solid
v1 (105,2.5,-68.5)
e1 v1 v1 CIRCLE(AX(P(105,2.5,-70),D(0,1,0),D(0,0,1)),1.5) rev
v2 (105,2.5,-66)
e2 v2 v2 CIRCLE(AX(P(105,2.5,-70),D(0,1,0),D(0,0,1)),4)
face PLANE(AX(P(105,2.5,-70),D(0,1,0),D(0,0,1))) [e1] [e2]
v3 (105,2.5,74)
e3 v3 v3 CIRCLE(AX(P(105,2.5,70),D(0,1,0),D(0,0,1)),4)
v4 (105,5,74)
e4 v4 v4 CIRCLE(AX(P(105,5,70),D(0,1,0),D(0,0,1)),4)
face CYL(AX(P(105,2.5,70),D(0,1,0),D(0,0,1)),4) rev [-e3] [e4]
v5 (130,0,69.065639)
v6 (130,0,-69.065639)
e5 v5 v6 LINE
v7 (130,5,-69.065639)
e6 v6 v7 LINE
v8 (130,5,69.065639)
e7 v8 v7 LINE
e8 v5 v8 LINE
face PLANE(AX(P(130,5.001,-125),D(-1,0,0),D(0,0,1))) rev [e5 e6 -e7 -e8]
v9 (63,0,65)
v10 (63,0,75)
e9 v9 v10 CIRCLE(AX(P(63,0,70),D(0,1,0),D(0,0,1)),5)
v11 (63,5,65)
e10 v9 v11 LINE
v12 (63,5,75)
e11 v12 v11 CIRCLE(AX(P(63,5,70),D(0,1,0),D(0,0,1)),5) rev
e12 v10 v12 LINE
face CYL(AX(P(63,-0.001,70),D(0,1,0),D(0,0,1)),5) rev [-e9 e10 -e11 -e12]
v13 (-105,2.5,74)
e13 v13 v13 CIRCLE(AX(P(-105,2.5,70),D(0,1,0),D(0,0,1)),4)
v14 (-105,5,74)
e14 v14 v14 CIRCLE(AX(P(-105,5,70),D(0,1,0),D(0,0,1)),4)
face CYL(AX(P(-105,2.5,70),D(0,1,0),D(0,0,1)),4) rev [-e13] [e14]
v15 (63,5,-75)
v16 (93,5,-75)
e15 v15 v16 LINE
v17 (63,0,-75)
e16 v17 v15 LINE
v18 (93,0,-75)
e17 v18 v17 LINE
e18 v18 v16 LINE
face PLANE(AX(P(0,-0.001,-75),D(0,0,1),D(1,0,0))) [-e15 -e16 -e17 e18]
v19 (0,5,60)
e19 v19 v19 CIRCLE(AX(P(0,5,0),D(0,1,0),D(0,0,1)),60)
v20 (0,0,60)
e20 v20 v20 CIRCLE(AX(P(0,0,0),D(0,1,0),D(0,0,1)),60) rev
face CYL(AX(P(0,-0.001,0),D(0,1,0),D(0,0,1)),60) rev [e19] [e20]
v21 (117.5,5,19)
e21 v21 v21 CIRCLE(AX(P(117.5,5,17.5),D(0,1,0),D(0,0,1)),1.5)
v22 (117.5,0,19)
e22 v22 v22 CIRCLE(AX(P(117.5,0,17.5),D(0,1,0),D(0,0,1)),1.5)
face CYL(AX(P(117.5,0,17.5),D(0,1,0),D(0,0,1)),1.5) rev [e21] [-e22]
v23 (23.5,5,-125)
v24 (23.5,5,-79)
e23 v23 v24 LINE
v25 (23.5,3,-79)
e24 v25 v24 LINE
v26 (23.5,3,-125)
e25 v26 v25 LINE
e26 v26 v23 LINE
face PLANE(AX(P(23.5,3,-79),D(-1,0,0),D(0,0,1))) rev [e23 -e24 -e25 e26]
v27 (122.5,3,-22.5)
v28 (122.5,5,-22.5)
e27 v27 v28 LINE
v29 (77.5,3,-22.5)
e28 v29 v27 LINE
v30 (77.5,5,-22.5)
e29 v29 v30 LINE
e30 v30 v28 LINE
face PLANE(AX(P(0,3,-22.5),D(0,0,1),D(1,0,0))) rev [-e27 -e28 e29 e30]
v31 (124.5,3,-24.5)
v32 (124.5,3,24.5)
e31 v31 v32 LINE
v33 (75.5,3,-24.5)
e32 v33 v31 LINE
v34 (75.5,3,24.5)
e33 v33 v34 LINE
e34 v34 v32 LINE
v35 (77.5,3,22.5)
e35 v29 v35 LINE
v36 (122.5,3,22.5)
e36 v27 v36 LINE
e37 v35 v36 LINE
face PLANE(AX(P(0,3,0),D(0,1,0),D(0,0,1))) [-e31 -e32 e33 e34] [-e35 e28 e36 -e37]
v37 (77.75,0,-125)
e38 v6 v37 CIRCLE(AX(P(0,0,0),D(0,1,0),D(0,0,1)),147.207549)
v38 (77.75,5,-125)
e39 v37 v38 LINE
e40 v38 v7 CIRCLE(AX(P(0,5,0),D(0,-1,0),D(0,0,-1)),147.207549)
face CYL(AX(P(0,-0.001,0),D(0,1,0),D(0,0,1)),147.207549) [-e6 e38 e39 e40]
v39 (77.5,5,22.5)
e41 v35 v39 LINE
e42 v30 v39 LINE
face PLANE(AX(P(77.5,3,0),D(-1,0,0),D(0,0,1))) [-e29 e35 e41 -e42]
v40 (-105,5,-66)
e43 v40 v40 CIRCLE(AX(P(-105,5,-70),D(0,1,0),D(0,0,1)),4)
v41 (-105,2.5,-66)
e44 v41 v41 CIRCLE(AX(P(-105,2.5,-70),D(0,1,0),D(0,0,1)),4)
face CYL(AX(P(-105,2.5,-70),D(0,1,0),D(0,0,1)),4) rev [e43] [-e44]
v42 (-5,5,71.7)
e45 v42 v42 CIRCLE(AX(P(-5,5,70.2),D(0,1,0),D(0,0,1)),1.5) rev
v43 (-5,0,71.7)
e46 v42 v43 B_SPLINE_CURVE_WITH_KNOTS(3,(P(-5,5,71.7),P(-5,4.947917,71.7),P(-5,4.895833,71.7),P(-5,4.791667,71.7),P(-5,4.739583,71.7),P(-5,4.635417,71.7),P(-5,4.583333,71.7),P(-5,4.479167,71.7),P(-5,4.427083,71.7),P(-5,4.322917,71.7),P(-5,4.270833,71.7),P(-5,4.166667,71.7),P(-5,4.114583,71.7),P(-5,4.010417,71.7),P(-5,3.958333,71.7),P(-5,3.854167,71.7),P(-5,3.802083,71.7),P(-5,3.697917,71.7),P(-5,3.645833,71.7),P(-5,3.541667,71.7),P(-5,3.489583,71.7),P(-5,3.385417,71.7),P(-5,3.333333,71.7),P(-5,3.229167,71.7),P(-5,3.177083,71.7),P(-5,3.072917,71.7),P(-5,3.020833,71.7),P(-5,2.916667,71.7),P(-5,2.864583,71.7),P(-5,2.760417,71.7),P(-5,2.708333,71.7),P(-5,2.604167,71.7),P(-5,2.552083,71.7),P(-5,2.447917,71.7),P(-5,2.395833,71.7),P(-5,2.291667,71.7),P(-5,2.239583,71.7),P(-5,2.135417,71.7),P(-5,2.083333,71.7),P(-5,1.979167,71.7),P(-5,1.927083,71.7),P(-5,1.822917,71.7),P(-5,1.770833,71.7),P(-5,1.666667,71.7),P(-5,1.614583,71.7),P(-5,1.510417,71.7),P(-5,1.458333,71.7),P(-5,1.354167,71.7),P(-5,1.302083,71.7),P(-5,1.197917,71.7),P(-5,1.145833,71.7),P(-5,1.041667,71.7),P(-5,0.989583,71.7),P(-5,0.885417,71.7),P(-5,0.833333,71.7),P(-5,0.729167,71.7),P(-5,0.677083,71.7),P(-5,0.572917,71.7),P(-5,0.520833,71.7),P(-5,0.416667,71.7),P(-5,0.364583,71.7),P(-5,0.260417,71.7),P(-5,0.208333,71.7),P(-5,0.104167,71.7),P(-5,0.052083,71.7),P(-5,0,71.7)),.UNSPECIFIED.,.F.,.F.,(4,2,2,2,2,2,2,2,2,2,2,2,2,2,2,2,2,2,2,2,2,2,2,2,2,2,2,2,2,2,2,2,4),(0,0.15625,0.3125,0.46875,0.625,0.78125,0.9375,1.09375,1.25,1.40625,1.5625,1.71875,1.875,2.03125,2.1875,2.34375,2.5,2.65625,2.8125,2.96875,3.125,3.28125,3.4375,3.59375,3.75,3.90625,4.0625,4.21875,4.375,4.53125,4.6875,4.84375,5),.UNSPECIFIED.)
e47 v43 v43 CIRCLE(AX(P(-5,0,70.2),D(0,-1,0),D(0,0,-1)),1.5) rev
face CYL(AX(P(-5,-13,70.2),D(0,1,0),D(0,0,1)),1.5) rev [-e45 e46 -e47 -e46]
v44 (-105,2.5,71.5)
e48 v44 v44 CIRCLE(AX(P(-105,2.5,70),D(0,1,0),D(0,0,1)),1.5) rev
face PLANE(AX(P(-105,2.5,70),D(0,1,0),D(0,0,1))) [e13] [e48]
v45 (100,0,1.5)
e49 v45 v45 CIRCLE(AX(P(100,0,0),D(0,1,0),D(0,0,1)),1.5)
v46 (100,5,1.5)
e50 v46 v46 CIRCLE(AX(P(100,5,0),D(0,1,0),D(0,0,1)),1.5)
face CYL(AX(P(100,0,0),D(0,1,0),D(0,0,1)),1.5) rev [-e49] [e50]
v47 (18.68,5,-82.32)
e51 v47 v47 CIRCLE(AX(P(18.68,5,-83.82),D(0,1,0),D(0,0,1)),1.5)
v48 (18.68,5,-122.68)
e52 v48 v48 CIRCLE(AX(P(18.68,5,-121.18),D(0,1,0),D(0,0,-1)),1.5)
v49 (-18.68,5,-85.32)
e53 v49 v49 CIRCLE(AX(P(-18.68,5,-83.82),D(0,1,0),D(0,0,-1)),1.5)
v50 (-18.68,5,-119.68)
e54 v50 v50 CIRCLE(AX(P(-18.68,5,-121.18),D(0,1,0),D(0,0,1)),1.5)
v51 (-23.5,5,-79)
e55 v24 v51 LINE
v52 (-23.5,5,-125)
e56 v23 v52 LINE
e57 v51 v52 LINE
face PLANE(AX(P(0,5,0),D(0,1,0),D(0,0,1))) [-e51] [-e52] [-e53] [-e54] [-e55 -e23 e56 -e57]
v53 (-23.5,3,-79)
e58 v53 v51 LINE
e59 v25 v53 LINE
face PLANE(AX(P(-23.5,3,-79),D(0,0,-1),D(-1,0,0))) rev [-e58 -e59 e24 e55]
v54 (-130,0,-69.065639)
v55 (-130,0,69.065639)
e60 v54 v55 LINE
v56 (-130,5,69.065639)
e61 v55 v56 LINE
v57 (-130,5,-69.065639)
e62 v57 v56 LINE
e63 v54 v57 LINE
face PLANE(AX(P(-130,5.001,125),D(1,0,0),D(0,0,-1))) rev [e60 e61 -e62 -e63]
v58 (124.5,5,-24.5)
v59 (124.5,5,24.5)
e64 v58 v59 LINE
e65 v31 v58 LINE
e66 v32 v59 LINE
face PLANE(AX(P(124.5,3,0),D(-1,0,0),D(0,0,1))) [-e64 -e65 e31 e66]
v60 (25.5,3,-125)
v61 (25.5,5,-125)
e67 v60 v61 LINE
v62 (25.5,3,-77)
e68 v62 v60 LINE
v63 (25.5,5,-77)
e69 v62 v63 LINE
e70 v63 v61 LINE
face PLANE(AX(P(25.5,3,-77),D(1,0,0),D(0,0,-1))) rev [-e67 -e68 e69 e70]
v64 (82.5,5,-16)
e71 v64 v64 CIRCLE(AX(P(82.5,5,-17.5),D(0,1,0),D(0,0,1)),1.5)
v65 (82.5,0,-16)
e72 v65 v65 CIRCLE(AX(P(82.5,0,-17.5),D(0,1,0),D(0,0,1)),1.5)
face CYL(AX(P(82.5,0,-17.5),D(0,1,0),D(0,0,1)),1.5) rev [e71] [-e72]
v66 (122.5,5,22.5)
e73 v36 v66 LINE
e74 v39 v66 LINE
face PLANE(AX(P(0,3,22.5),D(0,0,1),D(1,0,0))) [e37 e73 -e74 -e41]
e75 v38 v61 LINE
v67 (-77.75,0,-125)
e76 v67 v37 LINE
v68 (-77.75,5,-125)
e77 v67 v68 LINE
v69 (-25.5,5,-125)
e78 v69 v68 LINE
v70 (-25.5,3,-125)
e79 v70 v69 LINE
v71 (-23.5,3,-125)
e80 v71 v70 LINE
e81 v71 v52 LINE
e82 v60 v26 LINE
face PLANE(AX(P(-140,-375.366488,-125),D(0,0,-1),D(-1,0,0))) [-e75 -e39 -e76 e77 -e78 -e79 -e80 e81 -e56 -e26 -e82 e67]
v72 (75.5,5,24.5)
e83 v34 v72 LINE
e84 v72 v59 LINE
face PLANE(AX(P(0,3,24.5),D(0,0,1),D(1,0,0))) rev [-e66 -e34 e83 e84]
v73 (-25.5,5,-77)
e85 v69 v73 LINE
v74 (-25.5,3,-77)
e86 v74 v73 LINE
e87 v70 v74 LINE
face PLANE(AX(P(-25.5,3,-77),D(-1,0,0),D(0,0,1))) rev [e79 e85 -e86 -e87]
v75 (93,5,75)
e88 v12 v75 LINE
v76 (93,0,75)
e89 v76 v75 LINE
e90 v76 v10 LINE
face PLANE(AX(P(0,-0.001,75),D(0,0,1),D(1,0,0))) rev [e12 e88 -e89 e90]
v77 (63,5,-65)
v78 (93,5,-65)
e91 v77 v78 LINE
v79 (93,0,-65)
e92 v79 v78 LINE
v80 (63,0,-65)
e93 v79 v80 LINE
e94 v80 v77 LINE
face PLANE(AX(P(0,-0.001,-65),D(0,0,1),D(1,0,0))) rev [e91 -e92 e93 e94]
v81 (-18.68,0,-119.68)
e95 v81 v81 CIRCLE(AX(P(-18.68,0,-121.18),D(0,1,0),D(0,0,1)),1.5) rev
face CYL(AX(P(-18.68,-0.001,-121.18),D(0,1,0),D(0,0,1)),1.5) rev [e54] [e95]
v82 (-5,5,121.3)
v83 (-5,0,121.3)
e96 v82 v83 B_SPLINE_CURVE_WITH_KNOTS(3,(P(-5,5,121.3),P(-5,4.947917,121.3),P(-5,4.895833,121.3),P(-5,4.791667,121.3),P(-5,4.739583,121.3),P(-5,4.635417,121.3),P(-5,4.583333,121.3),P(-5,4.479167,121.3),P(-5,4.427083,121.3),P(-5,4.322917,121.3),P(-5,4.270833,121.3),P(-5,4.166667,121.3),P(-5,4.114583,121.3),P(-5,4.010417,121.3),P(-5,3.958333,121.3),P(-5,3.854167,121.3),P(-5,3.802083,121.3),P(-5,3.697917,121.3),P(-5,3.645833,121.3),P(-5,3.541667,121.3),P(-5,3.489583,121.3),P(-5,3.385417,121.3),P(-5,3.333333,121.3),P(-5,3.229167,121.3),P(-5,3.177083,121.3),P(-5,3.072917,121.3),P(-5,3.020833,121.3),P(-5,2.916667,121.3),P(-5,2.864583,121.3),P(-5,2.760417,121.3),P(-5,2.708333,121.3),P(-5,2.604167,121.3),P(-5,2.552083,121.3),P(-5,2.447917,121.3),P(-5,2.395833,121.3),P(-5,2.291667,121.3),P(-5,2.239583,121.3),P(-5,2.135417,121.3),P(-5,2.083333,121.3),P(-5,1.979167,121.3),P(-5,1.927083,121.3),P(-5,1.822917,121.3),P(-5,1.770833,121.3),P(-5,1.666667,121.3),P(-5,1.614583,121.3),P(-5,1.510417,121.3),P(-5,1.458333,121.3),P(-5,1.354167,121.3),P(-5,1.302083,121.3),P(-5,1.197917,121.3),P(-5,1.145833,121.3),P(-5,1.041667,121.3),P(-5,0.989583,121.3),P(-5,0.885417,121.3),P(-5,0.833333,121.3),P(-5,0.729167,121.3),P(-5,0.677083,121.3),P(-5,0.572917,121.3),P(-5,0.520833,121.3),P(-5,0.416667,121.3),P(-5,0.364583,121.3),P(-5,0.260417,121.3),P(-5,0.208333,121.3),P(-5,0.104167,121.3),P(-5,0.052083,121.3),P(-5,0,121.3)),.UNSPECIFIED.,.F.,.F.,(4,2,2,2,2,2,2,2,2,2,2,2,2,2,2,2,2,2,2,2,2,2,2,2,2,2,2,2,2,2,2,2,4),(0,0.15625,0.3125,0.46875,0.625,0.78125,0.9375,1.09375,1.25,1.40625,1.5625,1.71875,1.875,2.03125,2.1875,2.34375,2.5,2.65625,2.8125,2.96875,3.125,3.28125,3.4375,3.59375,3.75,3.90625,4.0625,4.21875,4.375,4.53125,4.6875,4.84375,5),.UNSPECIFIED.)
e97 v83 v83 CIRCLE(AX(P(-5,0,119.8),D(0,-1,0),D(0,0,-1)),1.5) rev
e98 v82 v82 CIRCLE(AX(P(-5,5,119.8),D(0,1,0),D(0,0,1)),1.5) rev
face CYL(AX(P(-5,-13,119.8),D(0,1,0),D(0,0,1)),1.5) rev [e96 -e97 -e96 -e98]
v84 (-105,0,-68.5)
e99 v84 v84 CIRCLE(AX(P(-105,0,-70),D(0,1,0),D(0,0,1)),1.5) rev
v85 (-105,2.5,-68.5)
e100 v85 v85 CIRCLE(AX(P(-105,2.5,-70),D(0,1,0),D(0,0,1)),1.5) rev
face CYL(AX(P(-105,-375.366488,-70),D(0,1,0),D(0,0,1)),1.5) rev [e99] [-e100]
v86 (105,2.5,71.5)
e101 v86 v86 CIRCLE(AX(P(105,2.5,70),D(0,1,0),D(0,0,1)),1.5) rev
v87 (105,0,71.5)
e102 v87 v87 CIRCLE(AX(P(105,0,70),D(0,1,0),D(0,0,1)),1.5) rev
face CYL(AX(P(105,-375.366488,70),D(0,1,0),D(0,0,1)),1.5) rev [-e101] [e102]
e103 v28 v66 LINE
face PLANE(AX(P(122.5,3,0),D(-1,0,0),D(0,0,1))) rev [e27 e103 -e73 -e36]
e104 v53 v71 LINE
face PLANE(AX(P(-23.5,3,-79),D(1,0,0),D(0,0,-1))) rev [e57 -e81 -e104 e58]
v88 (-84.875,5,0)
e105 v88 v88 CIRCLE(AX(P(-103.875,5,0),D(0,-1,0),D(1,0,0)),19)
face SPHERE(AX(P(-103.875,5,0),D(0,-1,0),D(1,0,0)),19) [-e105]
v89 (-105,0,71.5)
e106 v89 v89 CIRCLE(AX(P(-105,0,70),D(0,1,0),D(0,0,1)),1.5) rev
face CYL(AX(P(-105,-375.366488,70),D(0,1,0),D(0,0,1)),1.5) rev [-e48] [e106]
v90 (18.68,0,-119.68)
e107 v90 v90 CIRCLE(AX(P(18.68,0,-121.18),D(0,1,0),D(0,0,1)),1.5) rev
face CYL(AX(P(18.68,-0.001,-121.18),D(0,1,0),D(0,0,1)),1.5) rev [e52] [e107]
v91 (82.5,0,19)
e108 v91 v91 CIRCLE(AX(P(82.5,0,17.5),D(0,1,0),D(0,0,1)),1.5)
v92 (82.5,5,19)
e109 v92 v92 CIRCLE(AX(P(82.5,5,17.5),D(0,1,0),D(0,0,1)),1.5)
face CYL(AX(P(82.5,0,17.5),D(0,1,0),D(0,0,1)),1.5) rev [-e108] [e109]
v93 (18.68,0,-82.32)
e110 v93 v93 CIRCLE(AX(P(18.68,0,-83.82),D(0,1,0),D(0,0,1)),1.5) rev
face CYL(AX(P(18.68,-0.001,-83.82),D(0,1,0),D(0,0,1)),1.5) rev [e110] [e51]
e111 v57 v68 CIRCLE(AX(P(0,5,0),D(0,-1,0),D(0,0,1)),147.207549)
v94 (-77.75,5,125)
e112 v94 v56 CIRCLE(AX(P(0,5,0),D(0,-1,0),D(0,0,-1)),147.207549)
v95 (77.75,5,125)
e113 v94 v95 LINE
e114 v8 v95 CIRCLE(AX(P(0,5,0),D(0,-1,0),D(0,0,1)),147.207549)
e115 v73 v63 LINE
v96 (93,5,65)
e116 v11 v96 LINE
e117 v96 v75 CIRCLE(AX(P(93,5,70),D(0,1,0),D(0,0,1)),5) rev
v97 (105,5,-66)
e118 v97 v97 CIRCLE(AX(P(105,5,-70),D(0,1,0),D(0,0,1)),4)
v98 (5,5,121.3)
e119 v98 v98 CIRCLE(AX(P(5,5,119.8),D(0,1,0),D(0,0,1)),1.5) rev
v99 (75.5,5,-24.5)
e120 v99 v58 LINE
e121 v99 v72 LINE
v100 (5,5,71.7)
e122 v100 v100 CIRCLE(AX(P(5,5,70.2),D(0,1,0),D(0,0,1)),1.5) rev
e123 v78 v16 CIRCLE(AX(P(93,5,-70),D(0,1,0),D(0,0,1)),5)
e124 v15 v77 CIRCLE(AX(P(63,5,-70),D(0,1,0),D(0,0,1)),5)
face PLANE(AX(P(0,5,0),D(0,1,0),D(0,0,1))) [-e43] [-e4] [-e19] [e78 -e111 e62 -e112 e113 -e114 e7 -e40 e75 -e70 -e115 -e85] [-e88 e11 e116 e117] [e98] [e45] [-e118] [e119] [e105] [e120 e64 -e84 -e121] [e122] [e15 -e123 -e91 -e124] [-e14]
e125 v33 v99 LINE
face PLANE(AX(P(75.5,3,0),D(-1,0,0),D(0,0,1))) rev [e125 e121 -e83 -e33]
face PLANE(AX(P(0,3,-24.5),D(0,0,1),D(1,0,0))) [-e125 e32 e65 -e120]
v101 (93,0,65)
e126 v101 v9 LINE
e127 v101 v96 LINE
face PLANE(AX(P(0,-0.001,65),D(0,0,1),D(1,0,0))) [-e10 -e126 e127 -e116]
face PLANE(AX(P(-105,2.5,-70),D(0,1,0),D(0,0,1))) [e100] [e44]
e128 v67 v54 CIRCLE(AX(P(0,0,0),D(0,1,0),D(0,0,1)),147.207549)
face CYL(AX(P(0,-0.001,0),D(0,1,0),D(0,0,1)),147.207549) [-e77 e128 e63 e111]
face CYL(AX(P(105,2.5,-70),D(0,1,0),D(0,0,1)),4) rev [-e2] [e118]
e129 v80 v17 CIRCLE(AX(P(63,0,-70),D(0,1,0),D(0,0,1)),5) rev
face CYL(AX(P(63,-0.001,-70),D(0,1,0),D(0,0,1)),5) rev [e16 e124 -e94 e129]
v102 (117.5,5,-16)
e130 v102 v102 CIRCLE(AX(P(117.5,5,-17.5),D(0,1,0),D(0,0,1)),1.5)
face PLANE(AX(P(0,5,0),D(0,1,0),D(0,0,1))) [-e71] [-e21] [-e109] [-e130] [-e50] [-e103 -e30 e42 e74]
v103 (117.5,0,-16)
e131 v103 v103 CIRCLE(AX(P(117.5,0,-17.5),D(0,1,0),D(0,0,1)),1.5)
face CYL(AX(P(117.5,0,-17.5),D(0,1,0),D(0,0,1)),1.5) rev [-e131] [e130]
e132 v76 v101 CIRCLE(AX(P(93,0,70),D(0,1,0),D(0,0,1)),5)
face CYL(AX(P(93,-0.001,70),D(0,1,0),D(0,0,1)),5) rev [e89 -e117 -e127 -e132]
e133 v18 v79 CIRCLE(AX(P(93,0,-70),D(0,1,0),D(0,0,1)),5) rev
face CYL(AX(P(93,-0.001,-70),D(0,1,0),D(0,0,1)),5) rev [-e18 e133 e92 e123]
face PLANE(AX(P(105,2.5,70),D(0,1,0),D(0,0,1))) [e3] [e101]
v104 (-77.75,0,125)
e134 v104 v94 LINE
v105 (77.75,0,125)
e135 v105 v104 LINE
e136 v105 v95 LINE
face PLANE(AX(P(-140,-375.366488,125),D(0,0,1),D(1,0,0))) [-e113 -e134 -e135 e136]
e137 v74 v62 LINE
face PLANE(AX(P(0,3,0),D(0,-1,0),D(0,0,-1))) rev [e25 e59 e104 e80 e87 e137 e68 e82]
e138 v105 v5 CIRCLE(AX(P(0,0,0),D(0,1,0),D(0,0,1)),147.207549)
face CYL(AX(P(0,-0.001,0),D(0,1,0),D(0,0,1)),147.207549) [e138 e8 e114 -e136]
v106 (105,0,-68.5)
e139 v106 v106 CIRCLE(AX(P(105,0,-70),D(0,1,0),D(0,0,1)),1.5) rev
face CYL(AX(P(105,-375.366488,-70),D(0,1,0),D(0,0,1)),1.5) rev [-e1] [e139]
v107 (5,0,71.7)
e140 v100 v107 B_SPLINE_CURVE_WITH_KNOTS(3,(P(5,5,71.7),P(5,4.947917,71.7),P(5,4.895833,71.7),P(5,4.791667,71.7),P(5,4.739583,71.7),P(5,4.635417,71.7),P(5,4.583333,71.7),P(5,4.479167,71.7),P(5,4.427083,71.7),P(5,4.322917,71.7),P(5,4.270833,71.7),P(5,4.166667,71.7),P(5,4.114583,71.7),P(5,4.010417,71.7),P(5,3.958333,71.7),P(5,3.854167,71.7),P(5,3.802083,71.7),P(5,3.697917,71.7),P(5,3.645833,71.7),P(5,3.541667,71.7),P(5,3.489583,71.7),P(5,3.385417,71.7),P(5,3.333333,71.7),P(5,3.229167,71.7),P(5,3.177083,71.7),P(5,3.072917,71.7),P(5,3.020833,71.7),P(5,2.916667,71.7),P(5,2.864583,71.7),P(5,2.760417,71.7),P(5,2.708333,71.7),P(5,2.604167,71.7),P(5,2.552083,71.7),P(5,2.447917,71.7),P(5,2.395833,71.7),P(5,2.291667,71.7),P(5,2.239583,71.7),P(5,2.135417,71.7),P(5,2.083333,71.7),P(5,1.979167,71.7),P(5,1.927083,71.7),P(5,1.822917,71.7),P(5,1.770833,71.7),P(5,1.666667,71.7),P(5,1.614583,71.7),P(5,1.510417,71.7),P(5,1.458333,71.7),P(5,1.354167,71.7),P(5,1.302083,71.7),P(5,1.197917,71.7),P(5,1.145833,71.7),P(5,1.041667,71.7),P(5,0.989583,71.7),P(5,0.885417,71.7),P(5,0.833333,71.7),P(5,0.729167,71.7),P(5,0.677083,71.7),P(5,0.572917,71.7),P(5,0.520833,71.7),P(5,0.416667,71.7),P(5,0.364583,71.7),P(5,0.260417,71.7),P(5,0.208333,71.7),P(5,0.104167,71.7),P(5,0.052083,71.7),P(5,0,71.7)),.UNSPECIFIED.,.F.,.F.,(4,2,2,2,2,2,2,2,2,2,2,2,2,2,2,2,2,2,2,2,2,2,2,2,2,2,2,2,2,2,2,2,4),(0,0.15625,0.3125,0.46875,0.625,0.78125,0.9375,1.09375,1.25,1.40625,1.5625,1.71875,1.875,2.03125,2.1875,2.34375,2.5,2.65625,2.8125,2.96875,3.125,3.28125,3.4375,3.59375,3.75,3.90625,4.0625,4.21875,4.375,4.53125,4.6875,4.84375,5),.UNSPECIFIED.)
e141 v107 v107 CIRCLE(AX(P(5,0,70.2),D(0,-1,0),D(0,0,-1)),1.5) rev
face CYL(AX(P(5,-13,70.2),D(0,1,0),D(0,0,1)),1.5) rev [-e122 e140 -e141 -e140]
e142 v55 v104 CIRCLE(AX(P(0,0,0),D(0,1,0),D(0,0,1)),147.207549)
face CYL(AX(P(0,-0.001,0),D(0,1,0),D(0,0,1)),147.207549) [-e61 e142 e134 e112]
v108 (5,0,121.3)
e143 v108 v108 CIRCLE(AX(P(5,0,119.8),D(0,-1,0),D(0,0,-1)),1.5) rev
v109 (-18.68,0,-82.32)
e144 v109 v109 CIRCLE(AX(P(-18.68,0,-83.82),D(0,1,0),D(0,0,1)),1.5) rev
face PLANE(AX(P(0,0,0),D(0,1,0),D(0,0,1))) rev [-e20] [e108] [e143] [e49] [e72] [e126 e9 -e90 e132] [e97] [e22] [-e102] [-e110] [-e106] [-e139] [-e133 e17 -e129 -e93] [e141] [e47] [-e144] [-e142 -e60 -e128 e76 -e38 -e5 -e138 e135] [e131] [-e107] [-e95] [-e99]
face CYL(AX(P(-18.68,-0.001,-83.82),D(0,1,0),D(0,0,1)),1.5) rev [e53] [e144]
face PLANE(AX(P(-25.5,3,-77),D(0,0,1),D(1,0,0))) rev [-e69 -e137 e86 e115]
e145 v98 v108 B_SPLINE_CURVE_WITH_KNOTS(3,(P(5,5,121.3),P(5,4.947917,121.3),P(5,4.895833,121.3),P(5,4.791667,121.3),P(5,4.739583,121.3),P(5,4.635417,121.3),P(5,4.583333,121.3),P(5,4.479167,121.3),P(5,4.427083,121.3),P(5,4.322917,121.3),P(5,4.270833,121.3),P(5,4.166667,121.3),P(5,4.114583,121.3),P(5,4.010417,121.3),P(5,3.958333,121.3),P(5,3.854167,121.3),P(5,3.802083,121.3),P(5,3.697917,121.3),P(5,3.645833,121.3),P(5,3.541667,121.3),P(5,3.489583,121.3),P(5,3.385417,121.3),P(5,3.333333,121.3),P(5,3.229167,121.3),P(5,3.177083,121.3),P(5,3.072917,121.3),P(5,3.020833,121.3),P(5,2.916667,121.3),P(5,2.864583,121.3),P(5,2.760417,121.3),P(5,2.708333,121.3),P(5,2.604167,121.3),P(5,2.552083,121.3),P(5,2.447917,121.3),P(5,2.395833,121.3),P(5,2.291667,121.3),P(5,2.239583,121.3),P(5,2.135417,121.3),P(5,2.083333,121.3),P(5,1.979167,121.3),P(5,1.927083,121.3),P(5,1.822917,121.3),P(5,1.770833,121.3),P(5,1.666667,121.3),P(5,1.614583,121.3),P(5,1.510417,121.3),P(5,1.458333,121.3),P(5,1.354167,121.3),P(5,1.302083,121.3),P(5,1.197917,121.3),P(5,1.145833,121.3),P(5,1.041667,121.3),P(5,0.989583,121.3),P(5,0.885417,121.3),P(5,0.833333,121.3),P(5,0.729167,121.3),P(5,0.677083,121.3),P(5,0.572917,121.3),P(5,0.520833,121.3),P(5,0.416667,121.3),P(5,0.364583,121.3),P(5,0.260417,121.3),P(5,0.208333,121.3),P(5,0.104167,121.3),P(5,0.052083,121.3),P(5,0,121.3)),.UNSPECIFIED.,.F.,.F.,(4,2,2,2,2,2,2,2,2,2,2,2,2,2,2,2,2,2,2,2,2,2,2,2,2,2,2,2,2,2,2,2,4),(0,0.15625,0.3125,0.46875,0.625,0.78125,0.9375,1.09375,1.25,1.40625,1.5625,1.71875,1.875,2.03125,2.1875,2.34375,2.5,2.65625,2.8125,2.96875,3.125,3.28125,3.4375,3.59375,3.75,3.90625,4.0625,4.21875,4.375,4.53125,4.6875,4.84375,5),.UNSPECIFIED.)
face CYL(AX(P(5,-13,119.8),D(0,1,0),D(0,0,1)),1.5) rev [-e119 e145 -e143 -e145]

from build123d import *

# Parameters (mm, degrees)
SKETCH_1_W           = 200
SKETCH_1_H           = 150
EXTRUDE_1_DEPTH      = 5
SKETCH_2_W           = 280
SKETCH_2_H           = 250
SKETCH_2_R           = 1.5
EXTRUDE_2_DEPTH      = 5
SKETCH_3_R           = 11.5
CUT_EXTRUDE_1_DEPTH  = 5
SKETCH_4_R           = 3
SKETCH_4_R_2         = 1.5
EXTRUDE_3_DEPTH      = 13
CUT_EXTRUDE_4_REACH  = 190.133
SKETCH_8_R           = 1.5
CUT_EXTRUDE_5_REACH  = 190.133
SKETCH_9_W           = 10
SKETCH_9_H           = 250
SKETCH_10_W          = 41.454704644
SKETCH_10_H          = 62.998147515
CUT_EXTRUDE_6_DEPTH  = 13
CUT_EXTRUDE_7_REACH  = 182.416
SKETCH_11_R          = 1.5
CUT_EXTRUDE_8_DEPTH  = 2
CUT_EXTRUDE_9_REACH  = 182.416
SKETCH_13_R          = 30
CUT_EXTRUDE_10_REACH = 182.416
SKETCH_17_R          = 4
CUT_EXTRUDE_11_DEPTH = 2.5
SKETCH_18_W          = 49
SKETCH_18_H          = 49
SKETCH_18_W_2        = 45
SKETCH_18_H_2        = 45
CUT_EXTRUDE_12_DEPTH = 2
SKETCH_19_R          = 1.5
CUT_EXTRUDE_13_DEPTH = 182.344975116
CUT_EXTRUDE_14_REACH = 183.345
SKETCH_20_R          = 60
SKETCH_21_W          = 29.69805515
SKETCH_21_H          = 23
EXTRUDE_4_DEPTH      = 5
CUT_EXTRUDE_15_REACH = 183.345


# Read off the part's stored shape, not the designer's step: 旋转4
with BuildPart() as part:
    # 草图1 → 凸台-拉伸1 (new body)
    with BuildSketch(Plane(origin=(0, 0, 0), x_dir=(1, 0, 0), z_dir=(0, 1, 0))):
        Rectangle(SKETCH_1_W, SKETCH_1_H)
    extrude(amount=EXTRUDE_1_DEPTH)

    # 草图2 → 凸台-拉伸2 (add)
    with BuildSketch(Plane(origin=(0, 5, 0), x_dir=(1, 0, 0), z_dir=(0, 1, 0))):
        Rectangle(SKETCH_2_W, SKETCH_2_H)
        with Locations(Location((-105, 70, 0), (0, 0, 270))):
            Circle(SKETCH_2_R, mode=Mode.SUBTRACT)
        with Locations(Location((-105, -70, 0), (0, 0, 270))):
            Circle(SKETCH_2_R, mode=Mode.SUBTRACT)
        with Locations(Location((105, 70, 0), (0, 0, 270))):
            Circle(SKETCH_2_R, mode=Mode.SUBTRACT)
        with Locations(Location((105, -70, 0), (0, 0, 270))):
            Circle(SKETCH_2_R, mode=Mode.SUBTRACT)
    extrude(amount=-EXTRUDE_2_DEPTH)

    # 草图3 → 切除-拉伸1 (cut)
    with BuildSketch(Plane(origin=(0, 5, 0), x_dir=(1, 0, 0), z_dir=(0, 1, 0))):
        with Locations(Location((0, -85, 0), (0, 0, 270))):
            Circle(SKETCH_3_R)
    extrude(amount=-CUT_EXTRUDE_1_DEPTH, mode=Mode.SUBTRACT)

    # 草图4 → 凸台-拉伸3 (add)
    # profile 1 of 4: a face of its own
    with BuildSketch(Plane.XZ):
        with Locations(Location((-5, 119.8, 0), (0, 0, 90))):
            Circle(SKETCH_4_R)
        with Locations(Location((-5, 119.8, 0), (0, 0, 90))):
            Circle(SKETCH_4_R_2, mode=Mode.SUBTRACT)
    # profile 2 of 4: a face of its own
    with BuildSketch(Plane.XZ):
        with Locations(Location((5, 119.8, 0), (0, 0, 90))):
            Circle(SKETCH_4_R)
        with Locations(Location((5, 119.8, 0), (0, 0, 90))):
            Circle(SKETCH_4_R_2, mode=Mode.SUBTRACT)
    # profile 3 of 4: a face of its own
    with BuildSketch(Plane.XZ):
        with Locations(Location((5, 70.2, 0), (0, 0, 90))):
            Circle(SKETCH_4_R)
        with Locations(Location((5, 70.2, 0), (0, 0, 90))):
            Circle(SKETCH_4_R_2, mode=Mode.SUBTRACT)
    # profile 4 of 4: a face of its own
    with BuildSketch(Plane.XZ):
        with Locations(Location((-5, 70.2, 0), (0, 0, 90))):
            Circle(SKETCH_4_R)
        with Locations(Location((-5, 70.2, 0), (0, 0, 90))):
            Circle(SKETCH_4_R_2, mode=Mode.SUBTRACT)
    extrude(amount=EXTRUDE_3_DEPTH)

    # 草图8 → 切除-拉伸4 (cut, up to next)
    with BuildSketch(Plane.XZ, mode=Mode.PRIVATE) as cut_extrude_4_sk1:
        with Locations(Location((5, 119.8, 0), (0, 0, 90))):
            Circle(SKETCH_8_R)
    cut_extrude_4_tool1 = extrude(cut_extrude_4_sk1.sketch, amount=-CUT_EXTRUDE_4_REACH, mode=Mode.PRIVATE) & part.part
    # 草图8 → 切除-拉伸4 (cut, up to next)
    with BuildSketch(Plane.XZ, mode=Mode.PRIVATE) as cut_extrude_4_sk2:
        with Locations(Location((5, 70.2, 0), (0, 0, 90))):
            Circle(SKETCH_8_R)
    cut_extrude_4_tool2 = extrude(cut_extrude_4_sk2.sketch, amount=-CUT_EXTRUDE_4_REACH, mode=Mode.PRIVATE) & part.part
    # 草图8 → 切除-拉伸4 (cut, up to next)
    with BuildSketch(Plane.XZ, mode=Mode.PRIVATE) as cut_extrude_4_sk3:
        with Locations(Location((-5, 119.8, 0), (0, 0, 90))):
            Circle(SKETCH_8_R)
    cut_extrude_4_tool3 = extrude(cut_extrude_4_sk3.sketch, amount=-CUT_EXTRUDE_4_REACH, mode=Mode.PRIVATE) & part.part
    # 草图8 → 切除-拉伸4 (cut, up to next)
    with BuildSketch(Plane.XZ, mode=Mode.PRIVATE) as cut_extrude_4_sk4:
        with Locations(Location((-5, 70.2, 0), (0, 0, 90))):
            Circle(SKETCH_8_R)
    cut_extrude_4_tool4 = extrude(cut_extrude_4_sk4.sketch, amount=-CUT_EXTRUDE_4_REACH, mode=Mode.PRIVATE) & part.part
    add(cut_extrude_4_tool1.solids().sort_by_distance((5, 0, 119.8))[0], mode=Mode.SUBTRACT)
    add(cut_extrude_4_tool2.solids().sort_by_distance((5, 0, 70.2))[0], mode=Mode.SUBTRACT)
    add(cut_extrude_4_tool3.solids().sort_by_distance((-5, 0, 119.8))[0], mode=Mode.SUBTRACT)
    add(cut_extrude_4_tool4.solids().sort_by_distance((-5, 0, 70.2))[0], mode=Mode.SUBTRACT)

    # 草图9 → 切除-拉伸5 (cut, up to next)
    with BuildSketch(Plane.XZ, mode=Mode.PRIVATE) as cut_extrude_5_sk1:
        with Locations((-135, 0)):
            Rectangle(SKETCH_9_W, SKETCH_9_H)
    cut_extrude_5_tool1 = extrude(cut_extrude_5_sk1.sketch, amount=-CUT_EXTRUDE_5_REACH, mode=Mode.PRIVATE) & part.part
    # 草图9 → 切除-拉伸5 (cut, up to next)
    with BuildSketch(Plane.XZ, mode=Mode.PRIVATE) as cut_extrude_5_sk2:
        with Locations((135, 0)):
            Rectangle(SKETCH_9_W, SKETCH_9_H)
    cut_extrude_5_tool2 = extrude(cut_extrude_5_sk2.sketch, amount=-CUT_EXTRUDE_5_REACH, mode=Mode.PRIVATE) & part.part
    add(cut_extrude_5_tool1.solids().sort_by_distance((-135, 0, 0))[0], mode=Mode.SUBTRACT)
    add(cut_extrude_5_tool2.solids().sort_by_distance((135, 0, 0))[0], mode=Mode.SUBTRACT)

    # 草图10 → 切除-拉伸6 (cut)
    with BuildSketch(Plane.XZ):
        with Locations((1.571094054, 93.500926243)):
            Rectangle(SKETCH_10_W, SKETCH_10_H)
    extrude(amount=CUT_EXTRUDE_6_DEPTH, mode=Mode.SUBTRACT)

    # 草图11 → 切除-拉伸7 (cut, up to next)
    with BuildSketch(Plane(origin=(0, 5, 0), x_dir=(1, 0, 0), z_dir=(0, 1, 0)), mode=Mode.PRIVATE) as cut_extrude_7_sk1:
        with Locations(Location((-18.68, 121.18, 0), (0, 0, 270))):
            Circle(SKETCH_11_R)
    cut_extrude_7_tool1 = extrude(cut_extrude_7_sk1.sketch, amount=-CUT_EXTRUDE_7_REACH, mode=Mode.PRIVATE) & part.part
    # 草图11 → 切除-拉伸7 (cut, up to next)
    with BuildSketch(Plane(origin=(0, 5, 0), x_dir=(1, 0, 0), z_dir=(0, 1, 0)), mode=Mode.PRIVATE) as cut_extrude_7_sk2:
        with Locations(Location((18.68, 121.18, 0), (0, 0, 270))):
            Circle(SKETCH_11_R)
    cut_extrude_7_tool2 = extrude(cut_extrude_7_sk2.sketch, amount=-CUT_EXTRUDE_7_REACH, mode=Mode.PRIVATE) & part.part
    # 草图11 → 切除-拉伸7 (cut, up to next)
    with BuildSketch(Plane(origin=(0, 5, 0), x_dir=(1, 0, 0), z_dir=(0, 1, 0)), mode=Mode.PRIVATE) as cut_extrude_7_sk3:
        with Locations(Location((18.68, 83.82, 0), (0, 0, 270))):
            Circle(SKETCH_11_R)
    cut_extrude_7_tool3 = extrude(cut_extrude_7_sk3.sketch, amount=-CUT_EXTRUDE_7_REACH, mode=Mode.PRIVATE) & part.part
    # 草图11 → 切除-拉伸7 (cut, up to next)
    with BuildSketch(Plane(origin=(0, 5, 0), x_dir=(1, 0, 0), z_dir=(0, 1, 0)), mode=Mode.PRIVATE) as cut_extrude_7_sk4:
        with Locations(Location((-18.68, 83.82, 0), (0, 0, 270))):
            Circle(SKETCH_11_R)
    cut_extrude_7_tool4 = extrude(cut_extrude_7_sk4.sketch, amount=-CUT_EXTRUDE_7_REACH, mode=Mode.PRIVATE) & part.part
    add(cut_extrude_7_tool1.solids().sort_by_distance((-18.68, 5, -121.18))[0], mode=Mode.SUBTRACT)
    add(cut_extrude_7_tool2.solids().sort_by_distance((18.68, 5, -121.18))[0], mode=Mode.SUBTRACT)
    add(cut_extrude_7_tool3.solids().sort_by_distance((18.68, 5, -83.82))[0], mode=Mode.SUBTRACT)
    add(cut_extrude_7_tool4.solids().sort_by_distance((-18.68, 5, -83.82))[0], mode=Mode.SUBTRACT)

    # 草图12 → 切除-拉伸8 (cut)
    with BuildSketch(Plane(origin=(0, 5, 0), x_dir=(1, 0, 0), z_dir=(0, 1, 0))):
        Polygon((-23.5, 79), (23.5, 79), (23.5, 125), (25.5, 125), (25.5, 77), (-25.5, 77), (-25.5, 125), (-23.5, 125), align=None)
    extrude(amount=-CUT_EXTRUDE_8_DEPTH, mode=Mode.SUBTRACT)

    # 草图13 → 切除-拉伸9 (cut, up to next)
    with BuildSketch(Plane(origin=(0, 5, 0), x_dir=(1, 0, 0), z_dir=(0, 1, 0)), mode=Mode.PRIVATE) as cut_extrude_9_sk1:
        with Locations(Location((0, 0, 0), (0, 0, 270))):
            Circle(SKETCH_13_R)
    cut_extrude_9_tool1 = extrude(cut_extrude_9_sk1.sketch, amount=-CUT_EXTRUDE_9_REACH, mode=Mode.PRIVATE) & part.part
    add(cut_extrude_9_tool1.solids().sort_by_distance((0, 5, 0))[0], mode=Mode.SUBTRACT)

    # 草图14 → 切除-拉伸10 (cut, up to next)
    with BuildSketch(Plane(origin=(0, 5, 0), x_dir=(1, 0, 0), z_dir=(0, 1, 0)), mode=Mode.PRIVATE) as cut_extrude_10_sk1:
        with BuildLine():
            Line((77.75, 125), (130, 125))
            Line((130, 125), (130, 69.065639069))
            ThreePointArc((130, 69.065639069), (107.574061968, 100.488226633), (77.75, 125))
        make_face()
    cut_extrude_10_tool1 = extrude(cut_extrude_10_sk1.sketch, amount=-CUT_EXTRUDE_10_REACH, mode=Mode.PRIVATE) & part.part
    # 草图14 → 切除-拉伸10 (cut, up to next)
    with BuildSketch(Plane(origin=(0, 5, 0), x_dir=(1, 0, 0), z_dir=(0, 1, 0)), mode=Mode.PRIVATE) as cut_extrude_10_sk2:
        with BuildLine():
            Line((77.75, -125), (130, -125))
            Line((130, -125), (130, -69.065639069))
            ThreePointArc((130, -69.065639069), (107.574061968, -100.488226633), (77.75, -125))
        make_face()
    cut_extrude_10_tool2 = extrude(cut_extrude_10_sk2.sketch, amount=-CUT_EXTRUDE_10_REACH, mode=Mode.PRIVATE) & part.part
    # 草图14 → 切除-拉伸10 (cut, up to next)
    with BuildSketch(Plane(origin=(0, 5, 0), x_dir=(1, 0, 0), z_dir=(0, 1, 0)), mode=Mode.PRIVATE) as cut_extrude_10_sk3:
        with BuildLine():
            Line((-130, -125), (-130, -69.065639069))
            ThreePointArc((-130, -69.065639069), (-107.574061968, -100.488226633), (-77.75, -125))
            Line((-77.75, -125), (-130, -125))
        make_face()
    cut_extrude_10_tool3 = extrude(cut_extrude_10_sk3.sketch, amount=-CUT_EXTRUDE_10_REACH, mode=Mode.PRIVATE) & part.part
    # 草图14 → 切除-拉伸10 (cut, up to next)
    with BuildSketch(Plane(origin=(0, 5, 0), x_dir=(1, 0, 0), z_dir=(0, 1, 0)), mode=Mode.PRIVATE) as cut_extrude_10_sk4:
        with BuildLine():
            Line((-130, 125), (-130, 69.065639069))
            ThreePointArc((-130, 69.065639069), (-107.574061968, 100.488226633), (-77.75, 125))
            Line((-77.75, 125), (-130, 125))
        make_face()
    cut_extrude_10_tool4 = extrude(cut_extrude_10_sk4.sketch, amount=-CUT_EXTRUDE_10_REACH, mode=Mode.PRIVATE) & part.part
    add(cut_extrude_10_tool1.solids().sort_by_distance((114.14156, 5, -108.066894))[0], mode=Mode.SUBTRACT)
    add(cut_extrude_10_tool2.solids().sort_by_distance((114.14156, 5, 108.066894))[0], mode=Mode.SUBTRACT)
    add(cut_extrude_10_tool3.solids().sort_by_distance((-114.14156, 5, 108.066894))[0], mode=Mode.SUBTRACT)
    add(cut_extrude_10_tool4.solids().sort_by_distance((-114.14156, 5, -108.066894))[0], mode=Mode.SUBTRACT)

    # 旋转4 outline → 旋转4 (revolve)
    with BuildSketch(Plane(origin=(-103.875, 0, 0), x_dir=(1, 0, 0), z_dir=(0, 0, 1))):
        with BuildLine():
            Line((0, 4.999999981), (19, 4.999999981))
            ThreePointArc((19, 4.999999981), (13.435028849, 18.435028836), (0, 24))
            Line((0, 24), (0, 4.999999981))
        make_face()
    revolve(axis=Axis((-103.875, 0, 0), (0, 1, 0)))

    # 草图17 → 切除-拉伸11 (cut)
    with BuildSketch(Plane(origin=(0, 5, 0), x_dir=(1, 0, 0), z_dir=(0, 1, 0))):
        with Locations(Location((-105, 70, 0), (0, 0, 270))):
            Circle(SKETCH_17_R)
        with Locations(Location((105, 70, 0), (0, 0, 270))):
            Circle(SKETCH_17_R)
        with Locations(Location((105, -70, 0), (0, 0, 270))):
            Circle(SKETCH_17_R)
        with Locations(Location((-105, -70, 0), (0, 0, 270))):
            Circle(SKETCH_17_R)
    extrude(amount=-CUT_EXTRUDE_11_DEPTH, mode=Mode.SUBTRACT)

    # 草图18 → 切除-拉伸12 (cut)
    with BuildSketch(Plane(origin=(0, 5, 0), x_dir=(1, 0, 0), z_dir=(0, 1, 0))):
        with Locations((100, 0)):
            Rectangle(SKETCH_18_W, SKETCH_18_H)
        with Locations((100, 0)):
            Rectangle(SKETCH_18_W_2, SKETCH_18_H_2, mode=Mode.SUBTRACT)
    extrude(amount=-CUT_EXTRUDE_12_DEPTH, mode=Mode.SUBTRACT)

    # 草图19 → 切除-拉伸13 (cut, through all)
    with BuildSketch(Plane(origin=(0, 5, 0), x_dir=(1, 0, 0), z_dir=(0, 1, 0))):
        with Locations(Location((117.5, 17.5, 0), (0, 0, 270))):
            Circle(SKETCH_19_R)
        with Locations(Location((82.5, 17.5, 0), (0, 0, 270))):
            Circle(SKETCH_19_R)
        with Locations(Location((117.5, -17.5, 0), (0, 0, 270))):
            Circle(SKETCH_19_R)
        with Locations(Location((82.5, -17.5, 0), (0, 0, 270))):
            Circle(SKETCH_19_R)
        with Locations(Location((100, 0, 0), (0, 0, 270))):
            Circle(SKETCH_19_R)
    extrude(amount=-CUT_EXTRUDE_13_DEPTH, mode=Mode.SUBTRACT)

    # 草图20 → 切除-拉伸14 (cut, up to next)
    with BuildSketch(Plane(origin=(0, 5, 0), x_dir=(1, 0, 0), z_dir=(0, 1, 0)), mode=Mode.PRIVATE) as cut_extrude_14_sk1:
        with Locations(Location((0, 0, 0), (0, 0, 270))):
            Circle(SKETCH_20_R)
    cut_extrude_14_tool1 = extrude(cut_extrude_14_sk1.sketch, amount=-CUT_EXTRUDE_14_REACH, mode=Mode.PRIVATE) & part.part
    add(cut_extrude_14_tool1.solids().sort_by_distance((0, 5, 0))[0], mode=Mode.SUBTRACT)

    # 草图21 → 凸台-拉伸4 (add)
    with BuildSketch(Plane(origin=(0, 5, 0), x_dir=(1, 0, 0), z_dir=(0, 1, 0))):
        with Locations((0, -85)):
            Rectangle(SKETCH_21_W, SKETCH_21_H)
    extrude(amount=-EXTRUDE_4_DEPTH)

    # 草图22 → 切除-拉伸15 (cut, up to next)
    with BuildSketch(Plane(origin=(0, 5, 0), x_dir=(1, 0, 0), z_dir=(0, 1, 0)), mode=Mode.PRIVATE) as cut_extrude_15_sk1:
        with BuildLine():
            Line((63, 75), (93, 75))
            ThreePointArc((93, 75), (98, 70), (93, 65))
            Line((93, 65), (63, 65))
            ThreePointArc((63, 65), (58, 70), (63, 75))
        make_face()
    cut_extrude_15_tool1 = extrude(cut_extrude_15_sk1.sketch, amount=-CUT_EXTRUDE_15_REACH, mode=Mode.PRIVATE) & part.part
    # 草图22 → 切除-拉伸15 (cut, up to next)
    with BuildSketch(Plane(origin=(0, 5, 0), x_dir=(1, 0, 0), z_dir=(0, 1, 0)), mode=Mode.PRIVATE) as cut_extrude_15_sk2:
        with BuildLine():
            Line((63, -75), (93, -75))
            ThreePointArc((93, -75), (98, -70), (93, -65))
            Line((93, -65), (63, -65))
            ThreePointArc((63, -65), (58, -70), (63, -75))
        make_face()
    cut_extrude_15_tool2 = extrude(cut_extrude_15_sk2.sketch, amount=-CUT_EXTRUDE_15_REACH, mode=Mode.PRIVATE) & part.part
    add(cut_extrude_15_tool1.solids().sort_by_distance((78, 5, -70))[0], mode=Mode.SUBTRACT)
    add(cut_extrude_15_tool2.solids().sort_by_distance((78, 5, 70))[0], mode=Mode.SUBTRACT)


solid = part.part
